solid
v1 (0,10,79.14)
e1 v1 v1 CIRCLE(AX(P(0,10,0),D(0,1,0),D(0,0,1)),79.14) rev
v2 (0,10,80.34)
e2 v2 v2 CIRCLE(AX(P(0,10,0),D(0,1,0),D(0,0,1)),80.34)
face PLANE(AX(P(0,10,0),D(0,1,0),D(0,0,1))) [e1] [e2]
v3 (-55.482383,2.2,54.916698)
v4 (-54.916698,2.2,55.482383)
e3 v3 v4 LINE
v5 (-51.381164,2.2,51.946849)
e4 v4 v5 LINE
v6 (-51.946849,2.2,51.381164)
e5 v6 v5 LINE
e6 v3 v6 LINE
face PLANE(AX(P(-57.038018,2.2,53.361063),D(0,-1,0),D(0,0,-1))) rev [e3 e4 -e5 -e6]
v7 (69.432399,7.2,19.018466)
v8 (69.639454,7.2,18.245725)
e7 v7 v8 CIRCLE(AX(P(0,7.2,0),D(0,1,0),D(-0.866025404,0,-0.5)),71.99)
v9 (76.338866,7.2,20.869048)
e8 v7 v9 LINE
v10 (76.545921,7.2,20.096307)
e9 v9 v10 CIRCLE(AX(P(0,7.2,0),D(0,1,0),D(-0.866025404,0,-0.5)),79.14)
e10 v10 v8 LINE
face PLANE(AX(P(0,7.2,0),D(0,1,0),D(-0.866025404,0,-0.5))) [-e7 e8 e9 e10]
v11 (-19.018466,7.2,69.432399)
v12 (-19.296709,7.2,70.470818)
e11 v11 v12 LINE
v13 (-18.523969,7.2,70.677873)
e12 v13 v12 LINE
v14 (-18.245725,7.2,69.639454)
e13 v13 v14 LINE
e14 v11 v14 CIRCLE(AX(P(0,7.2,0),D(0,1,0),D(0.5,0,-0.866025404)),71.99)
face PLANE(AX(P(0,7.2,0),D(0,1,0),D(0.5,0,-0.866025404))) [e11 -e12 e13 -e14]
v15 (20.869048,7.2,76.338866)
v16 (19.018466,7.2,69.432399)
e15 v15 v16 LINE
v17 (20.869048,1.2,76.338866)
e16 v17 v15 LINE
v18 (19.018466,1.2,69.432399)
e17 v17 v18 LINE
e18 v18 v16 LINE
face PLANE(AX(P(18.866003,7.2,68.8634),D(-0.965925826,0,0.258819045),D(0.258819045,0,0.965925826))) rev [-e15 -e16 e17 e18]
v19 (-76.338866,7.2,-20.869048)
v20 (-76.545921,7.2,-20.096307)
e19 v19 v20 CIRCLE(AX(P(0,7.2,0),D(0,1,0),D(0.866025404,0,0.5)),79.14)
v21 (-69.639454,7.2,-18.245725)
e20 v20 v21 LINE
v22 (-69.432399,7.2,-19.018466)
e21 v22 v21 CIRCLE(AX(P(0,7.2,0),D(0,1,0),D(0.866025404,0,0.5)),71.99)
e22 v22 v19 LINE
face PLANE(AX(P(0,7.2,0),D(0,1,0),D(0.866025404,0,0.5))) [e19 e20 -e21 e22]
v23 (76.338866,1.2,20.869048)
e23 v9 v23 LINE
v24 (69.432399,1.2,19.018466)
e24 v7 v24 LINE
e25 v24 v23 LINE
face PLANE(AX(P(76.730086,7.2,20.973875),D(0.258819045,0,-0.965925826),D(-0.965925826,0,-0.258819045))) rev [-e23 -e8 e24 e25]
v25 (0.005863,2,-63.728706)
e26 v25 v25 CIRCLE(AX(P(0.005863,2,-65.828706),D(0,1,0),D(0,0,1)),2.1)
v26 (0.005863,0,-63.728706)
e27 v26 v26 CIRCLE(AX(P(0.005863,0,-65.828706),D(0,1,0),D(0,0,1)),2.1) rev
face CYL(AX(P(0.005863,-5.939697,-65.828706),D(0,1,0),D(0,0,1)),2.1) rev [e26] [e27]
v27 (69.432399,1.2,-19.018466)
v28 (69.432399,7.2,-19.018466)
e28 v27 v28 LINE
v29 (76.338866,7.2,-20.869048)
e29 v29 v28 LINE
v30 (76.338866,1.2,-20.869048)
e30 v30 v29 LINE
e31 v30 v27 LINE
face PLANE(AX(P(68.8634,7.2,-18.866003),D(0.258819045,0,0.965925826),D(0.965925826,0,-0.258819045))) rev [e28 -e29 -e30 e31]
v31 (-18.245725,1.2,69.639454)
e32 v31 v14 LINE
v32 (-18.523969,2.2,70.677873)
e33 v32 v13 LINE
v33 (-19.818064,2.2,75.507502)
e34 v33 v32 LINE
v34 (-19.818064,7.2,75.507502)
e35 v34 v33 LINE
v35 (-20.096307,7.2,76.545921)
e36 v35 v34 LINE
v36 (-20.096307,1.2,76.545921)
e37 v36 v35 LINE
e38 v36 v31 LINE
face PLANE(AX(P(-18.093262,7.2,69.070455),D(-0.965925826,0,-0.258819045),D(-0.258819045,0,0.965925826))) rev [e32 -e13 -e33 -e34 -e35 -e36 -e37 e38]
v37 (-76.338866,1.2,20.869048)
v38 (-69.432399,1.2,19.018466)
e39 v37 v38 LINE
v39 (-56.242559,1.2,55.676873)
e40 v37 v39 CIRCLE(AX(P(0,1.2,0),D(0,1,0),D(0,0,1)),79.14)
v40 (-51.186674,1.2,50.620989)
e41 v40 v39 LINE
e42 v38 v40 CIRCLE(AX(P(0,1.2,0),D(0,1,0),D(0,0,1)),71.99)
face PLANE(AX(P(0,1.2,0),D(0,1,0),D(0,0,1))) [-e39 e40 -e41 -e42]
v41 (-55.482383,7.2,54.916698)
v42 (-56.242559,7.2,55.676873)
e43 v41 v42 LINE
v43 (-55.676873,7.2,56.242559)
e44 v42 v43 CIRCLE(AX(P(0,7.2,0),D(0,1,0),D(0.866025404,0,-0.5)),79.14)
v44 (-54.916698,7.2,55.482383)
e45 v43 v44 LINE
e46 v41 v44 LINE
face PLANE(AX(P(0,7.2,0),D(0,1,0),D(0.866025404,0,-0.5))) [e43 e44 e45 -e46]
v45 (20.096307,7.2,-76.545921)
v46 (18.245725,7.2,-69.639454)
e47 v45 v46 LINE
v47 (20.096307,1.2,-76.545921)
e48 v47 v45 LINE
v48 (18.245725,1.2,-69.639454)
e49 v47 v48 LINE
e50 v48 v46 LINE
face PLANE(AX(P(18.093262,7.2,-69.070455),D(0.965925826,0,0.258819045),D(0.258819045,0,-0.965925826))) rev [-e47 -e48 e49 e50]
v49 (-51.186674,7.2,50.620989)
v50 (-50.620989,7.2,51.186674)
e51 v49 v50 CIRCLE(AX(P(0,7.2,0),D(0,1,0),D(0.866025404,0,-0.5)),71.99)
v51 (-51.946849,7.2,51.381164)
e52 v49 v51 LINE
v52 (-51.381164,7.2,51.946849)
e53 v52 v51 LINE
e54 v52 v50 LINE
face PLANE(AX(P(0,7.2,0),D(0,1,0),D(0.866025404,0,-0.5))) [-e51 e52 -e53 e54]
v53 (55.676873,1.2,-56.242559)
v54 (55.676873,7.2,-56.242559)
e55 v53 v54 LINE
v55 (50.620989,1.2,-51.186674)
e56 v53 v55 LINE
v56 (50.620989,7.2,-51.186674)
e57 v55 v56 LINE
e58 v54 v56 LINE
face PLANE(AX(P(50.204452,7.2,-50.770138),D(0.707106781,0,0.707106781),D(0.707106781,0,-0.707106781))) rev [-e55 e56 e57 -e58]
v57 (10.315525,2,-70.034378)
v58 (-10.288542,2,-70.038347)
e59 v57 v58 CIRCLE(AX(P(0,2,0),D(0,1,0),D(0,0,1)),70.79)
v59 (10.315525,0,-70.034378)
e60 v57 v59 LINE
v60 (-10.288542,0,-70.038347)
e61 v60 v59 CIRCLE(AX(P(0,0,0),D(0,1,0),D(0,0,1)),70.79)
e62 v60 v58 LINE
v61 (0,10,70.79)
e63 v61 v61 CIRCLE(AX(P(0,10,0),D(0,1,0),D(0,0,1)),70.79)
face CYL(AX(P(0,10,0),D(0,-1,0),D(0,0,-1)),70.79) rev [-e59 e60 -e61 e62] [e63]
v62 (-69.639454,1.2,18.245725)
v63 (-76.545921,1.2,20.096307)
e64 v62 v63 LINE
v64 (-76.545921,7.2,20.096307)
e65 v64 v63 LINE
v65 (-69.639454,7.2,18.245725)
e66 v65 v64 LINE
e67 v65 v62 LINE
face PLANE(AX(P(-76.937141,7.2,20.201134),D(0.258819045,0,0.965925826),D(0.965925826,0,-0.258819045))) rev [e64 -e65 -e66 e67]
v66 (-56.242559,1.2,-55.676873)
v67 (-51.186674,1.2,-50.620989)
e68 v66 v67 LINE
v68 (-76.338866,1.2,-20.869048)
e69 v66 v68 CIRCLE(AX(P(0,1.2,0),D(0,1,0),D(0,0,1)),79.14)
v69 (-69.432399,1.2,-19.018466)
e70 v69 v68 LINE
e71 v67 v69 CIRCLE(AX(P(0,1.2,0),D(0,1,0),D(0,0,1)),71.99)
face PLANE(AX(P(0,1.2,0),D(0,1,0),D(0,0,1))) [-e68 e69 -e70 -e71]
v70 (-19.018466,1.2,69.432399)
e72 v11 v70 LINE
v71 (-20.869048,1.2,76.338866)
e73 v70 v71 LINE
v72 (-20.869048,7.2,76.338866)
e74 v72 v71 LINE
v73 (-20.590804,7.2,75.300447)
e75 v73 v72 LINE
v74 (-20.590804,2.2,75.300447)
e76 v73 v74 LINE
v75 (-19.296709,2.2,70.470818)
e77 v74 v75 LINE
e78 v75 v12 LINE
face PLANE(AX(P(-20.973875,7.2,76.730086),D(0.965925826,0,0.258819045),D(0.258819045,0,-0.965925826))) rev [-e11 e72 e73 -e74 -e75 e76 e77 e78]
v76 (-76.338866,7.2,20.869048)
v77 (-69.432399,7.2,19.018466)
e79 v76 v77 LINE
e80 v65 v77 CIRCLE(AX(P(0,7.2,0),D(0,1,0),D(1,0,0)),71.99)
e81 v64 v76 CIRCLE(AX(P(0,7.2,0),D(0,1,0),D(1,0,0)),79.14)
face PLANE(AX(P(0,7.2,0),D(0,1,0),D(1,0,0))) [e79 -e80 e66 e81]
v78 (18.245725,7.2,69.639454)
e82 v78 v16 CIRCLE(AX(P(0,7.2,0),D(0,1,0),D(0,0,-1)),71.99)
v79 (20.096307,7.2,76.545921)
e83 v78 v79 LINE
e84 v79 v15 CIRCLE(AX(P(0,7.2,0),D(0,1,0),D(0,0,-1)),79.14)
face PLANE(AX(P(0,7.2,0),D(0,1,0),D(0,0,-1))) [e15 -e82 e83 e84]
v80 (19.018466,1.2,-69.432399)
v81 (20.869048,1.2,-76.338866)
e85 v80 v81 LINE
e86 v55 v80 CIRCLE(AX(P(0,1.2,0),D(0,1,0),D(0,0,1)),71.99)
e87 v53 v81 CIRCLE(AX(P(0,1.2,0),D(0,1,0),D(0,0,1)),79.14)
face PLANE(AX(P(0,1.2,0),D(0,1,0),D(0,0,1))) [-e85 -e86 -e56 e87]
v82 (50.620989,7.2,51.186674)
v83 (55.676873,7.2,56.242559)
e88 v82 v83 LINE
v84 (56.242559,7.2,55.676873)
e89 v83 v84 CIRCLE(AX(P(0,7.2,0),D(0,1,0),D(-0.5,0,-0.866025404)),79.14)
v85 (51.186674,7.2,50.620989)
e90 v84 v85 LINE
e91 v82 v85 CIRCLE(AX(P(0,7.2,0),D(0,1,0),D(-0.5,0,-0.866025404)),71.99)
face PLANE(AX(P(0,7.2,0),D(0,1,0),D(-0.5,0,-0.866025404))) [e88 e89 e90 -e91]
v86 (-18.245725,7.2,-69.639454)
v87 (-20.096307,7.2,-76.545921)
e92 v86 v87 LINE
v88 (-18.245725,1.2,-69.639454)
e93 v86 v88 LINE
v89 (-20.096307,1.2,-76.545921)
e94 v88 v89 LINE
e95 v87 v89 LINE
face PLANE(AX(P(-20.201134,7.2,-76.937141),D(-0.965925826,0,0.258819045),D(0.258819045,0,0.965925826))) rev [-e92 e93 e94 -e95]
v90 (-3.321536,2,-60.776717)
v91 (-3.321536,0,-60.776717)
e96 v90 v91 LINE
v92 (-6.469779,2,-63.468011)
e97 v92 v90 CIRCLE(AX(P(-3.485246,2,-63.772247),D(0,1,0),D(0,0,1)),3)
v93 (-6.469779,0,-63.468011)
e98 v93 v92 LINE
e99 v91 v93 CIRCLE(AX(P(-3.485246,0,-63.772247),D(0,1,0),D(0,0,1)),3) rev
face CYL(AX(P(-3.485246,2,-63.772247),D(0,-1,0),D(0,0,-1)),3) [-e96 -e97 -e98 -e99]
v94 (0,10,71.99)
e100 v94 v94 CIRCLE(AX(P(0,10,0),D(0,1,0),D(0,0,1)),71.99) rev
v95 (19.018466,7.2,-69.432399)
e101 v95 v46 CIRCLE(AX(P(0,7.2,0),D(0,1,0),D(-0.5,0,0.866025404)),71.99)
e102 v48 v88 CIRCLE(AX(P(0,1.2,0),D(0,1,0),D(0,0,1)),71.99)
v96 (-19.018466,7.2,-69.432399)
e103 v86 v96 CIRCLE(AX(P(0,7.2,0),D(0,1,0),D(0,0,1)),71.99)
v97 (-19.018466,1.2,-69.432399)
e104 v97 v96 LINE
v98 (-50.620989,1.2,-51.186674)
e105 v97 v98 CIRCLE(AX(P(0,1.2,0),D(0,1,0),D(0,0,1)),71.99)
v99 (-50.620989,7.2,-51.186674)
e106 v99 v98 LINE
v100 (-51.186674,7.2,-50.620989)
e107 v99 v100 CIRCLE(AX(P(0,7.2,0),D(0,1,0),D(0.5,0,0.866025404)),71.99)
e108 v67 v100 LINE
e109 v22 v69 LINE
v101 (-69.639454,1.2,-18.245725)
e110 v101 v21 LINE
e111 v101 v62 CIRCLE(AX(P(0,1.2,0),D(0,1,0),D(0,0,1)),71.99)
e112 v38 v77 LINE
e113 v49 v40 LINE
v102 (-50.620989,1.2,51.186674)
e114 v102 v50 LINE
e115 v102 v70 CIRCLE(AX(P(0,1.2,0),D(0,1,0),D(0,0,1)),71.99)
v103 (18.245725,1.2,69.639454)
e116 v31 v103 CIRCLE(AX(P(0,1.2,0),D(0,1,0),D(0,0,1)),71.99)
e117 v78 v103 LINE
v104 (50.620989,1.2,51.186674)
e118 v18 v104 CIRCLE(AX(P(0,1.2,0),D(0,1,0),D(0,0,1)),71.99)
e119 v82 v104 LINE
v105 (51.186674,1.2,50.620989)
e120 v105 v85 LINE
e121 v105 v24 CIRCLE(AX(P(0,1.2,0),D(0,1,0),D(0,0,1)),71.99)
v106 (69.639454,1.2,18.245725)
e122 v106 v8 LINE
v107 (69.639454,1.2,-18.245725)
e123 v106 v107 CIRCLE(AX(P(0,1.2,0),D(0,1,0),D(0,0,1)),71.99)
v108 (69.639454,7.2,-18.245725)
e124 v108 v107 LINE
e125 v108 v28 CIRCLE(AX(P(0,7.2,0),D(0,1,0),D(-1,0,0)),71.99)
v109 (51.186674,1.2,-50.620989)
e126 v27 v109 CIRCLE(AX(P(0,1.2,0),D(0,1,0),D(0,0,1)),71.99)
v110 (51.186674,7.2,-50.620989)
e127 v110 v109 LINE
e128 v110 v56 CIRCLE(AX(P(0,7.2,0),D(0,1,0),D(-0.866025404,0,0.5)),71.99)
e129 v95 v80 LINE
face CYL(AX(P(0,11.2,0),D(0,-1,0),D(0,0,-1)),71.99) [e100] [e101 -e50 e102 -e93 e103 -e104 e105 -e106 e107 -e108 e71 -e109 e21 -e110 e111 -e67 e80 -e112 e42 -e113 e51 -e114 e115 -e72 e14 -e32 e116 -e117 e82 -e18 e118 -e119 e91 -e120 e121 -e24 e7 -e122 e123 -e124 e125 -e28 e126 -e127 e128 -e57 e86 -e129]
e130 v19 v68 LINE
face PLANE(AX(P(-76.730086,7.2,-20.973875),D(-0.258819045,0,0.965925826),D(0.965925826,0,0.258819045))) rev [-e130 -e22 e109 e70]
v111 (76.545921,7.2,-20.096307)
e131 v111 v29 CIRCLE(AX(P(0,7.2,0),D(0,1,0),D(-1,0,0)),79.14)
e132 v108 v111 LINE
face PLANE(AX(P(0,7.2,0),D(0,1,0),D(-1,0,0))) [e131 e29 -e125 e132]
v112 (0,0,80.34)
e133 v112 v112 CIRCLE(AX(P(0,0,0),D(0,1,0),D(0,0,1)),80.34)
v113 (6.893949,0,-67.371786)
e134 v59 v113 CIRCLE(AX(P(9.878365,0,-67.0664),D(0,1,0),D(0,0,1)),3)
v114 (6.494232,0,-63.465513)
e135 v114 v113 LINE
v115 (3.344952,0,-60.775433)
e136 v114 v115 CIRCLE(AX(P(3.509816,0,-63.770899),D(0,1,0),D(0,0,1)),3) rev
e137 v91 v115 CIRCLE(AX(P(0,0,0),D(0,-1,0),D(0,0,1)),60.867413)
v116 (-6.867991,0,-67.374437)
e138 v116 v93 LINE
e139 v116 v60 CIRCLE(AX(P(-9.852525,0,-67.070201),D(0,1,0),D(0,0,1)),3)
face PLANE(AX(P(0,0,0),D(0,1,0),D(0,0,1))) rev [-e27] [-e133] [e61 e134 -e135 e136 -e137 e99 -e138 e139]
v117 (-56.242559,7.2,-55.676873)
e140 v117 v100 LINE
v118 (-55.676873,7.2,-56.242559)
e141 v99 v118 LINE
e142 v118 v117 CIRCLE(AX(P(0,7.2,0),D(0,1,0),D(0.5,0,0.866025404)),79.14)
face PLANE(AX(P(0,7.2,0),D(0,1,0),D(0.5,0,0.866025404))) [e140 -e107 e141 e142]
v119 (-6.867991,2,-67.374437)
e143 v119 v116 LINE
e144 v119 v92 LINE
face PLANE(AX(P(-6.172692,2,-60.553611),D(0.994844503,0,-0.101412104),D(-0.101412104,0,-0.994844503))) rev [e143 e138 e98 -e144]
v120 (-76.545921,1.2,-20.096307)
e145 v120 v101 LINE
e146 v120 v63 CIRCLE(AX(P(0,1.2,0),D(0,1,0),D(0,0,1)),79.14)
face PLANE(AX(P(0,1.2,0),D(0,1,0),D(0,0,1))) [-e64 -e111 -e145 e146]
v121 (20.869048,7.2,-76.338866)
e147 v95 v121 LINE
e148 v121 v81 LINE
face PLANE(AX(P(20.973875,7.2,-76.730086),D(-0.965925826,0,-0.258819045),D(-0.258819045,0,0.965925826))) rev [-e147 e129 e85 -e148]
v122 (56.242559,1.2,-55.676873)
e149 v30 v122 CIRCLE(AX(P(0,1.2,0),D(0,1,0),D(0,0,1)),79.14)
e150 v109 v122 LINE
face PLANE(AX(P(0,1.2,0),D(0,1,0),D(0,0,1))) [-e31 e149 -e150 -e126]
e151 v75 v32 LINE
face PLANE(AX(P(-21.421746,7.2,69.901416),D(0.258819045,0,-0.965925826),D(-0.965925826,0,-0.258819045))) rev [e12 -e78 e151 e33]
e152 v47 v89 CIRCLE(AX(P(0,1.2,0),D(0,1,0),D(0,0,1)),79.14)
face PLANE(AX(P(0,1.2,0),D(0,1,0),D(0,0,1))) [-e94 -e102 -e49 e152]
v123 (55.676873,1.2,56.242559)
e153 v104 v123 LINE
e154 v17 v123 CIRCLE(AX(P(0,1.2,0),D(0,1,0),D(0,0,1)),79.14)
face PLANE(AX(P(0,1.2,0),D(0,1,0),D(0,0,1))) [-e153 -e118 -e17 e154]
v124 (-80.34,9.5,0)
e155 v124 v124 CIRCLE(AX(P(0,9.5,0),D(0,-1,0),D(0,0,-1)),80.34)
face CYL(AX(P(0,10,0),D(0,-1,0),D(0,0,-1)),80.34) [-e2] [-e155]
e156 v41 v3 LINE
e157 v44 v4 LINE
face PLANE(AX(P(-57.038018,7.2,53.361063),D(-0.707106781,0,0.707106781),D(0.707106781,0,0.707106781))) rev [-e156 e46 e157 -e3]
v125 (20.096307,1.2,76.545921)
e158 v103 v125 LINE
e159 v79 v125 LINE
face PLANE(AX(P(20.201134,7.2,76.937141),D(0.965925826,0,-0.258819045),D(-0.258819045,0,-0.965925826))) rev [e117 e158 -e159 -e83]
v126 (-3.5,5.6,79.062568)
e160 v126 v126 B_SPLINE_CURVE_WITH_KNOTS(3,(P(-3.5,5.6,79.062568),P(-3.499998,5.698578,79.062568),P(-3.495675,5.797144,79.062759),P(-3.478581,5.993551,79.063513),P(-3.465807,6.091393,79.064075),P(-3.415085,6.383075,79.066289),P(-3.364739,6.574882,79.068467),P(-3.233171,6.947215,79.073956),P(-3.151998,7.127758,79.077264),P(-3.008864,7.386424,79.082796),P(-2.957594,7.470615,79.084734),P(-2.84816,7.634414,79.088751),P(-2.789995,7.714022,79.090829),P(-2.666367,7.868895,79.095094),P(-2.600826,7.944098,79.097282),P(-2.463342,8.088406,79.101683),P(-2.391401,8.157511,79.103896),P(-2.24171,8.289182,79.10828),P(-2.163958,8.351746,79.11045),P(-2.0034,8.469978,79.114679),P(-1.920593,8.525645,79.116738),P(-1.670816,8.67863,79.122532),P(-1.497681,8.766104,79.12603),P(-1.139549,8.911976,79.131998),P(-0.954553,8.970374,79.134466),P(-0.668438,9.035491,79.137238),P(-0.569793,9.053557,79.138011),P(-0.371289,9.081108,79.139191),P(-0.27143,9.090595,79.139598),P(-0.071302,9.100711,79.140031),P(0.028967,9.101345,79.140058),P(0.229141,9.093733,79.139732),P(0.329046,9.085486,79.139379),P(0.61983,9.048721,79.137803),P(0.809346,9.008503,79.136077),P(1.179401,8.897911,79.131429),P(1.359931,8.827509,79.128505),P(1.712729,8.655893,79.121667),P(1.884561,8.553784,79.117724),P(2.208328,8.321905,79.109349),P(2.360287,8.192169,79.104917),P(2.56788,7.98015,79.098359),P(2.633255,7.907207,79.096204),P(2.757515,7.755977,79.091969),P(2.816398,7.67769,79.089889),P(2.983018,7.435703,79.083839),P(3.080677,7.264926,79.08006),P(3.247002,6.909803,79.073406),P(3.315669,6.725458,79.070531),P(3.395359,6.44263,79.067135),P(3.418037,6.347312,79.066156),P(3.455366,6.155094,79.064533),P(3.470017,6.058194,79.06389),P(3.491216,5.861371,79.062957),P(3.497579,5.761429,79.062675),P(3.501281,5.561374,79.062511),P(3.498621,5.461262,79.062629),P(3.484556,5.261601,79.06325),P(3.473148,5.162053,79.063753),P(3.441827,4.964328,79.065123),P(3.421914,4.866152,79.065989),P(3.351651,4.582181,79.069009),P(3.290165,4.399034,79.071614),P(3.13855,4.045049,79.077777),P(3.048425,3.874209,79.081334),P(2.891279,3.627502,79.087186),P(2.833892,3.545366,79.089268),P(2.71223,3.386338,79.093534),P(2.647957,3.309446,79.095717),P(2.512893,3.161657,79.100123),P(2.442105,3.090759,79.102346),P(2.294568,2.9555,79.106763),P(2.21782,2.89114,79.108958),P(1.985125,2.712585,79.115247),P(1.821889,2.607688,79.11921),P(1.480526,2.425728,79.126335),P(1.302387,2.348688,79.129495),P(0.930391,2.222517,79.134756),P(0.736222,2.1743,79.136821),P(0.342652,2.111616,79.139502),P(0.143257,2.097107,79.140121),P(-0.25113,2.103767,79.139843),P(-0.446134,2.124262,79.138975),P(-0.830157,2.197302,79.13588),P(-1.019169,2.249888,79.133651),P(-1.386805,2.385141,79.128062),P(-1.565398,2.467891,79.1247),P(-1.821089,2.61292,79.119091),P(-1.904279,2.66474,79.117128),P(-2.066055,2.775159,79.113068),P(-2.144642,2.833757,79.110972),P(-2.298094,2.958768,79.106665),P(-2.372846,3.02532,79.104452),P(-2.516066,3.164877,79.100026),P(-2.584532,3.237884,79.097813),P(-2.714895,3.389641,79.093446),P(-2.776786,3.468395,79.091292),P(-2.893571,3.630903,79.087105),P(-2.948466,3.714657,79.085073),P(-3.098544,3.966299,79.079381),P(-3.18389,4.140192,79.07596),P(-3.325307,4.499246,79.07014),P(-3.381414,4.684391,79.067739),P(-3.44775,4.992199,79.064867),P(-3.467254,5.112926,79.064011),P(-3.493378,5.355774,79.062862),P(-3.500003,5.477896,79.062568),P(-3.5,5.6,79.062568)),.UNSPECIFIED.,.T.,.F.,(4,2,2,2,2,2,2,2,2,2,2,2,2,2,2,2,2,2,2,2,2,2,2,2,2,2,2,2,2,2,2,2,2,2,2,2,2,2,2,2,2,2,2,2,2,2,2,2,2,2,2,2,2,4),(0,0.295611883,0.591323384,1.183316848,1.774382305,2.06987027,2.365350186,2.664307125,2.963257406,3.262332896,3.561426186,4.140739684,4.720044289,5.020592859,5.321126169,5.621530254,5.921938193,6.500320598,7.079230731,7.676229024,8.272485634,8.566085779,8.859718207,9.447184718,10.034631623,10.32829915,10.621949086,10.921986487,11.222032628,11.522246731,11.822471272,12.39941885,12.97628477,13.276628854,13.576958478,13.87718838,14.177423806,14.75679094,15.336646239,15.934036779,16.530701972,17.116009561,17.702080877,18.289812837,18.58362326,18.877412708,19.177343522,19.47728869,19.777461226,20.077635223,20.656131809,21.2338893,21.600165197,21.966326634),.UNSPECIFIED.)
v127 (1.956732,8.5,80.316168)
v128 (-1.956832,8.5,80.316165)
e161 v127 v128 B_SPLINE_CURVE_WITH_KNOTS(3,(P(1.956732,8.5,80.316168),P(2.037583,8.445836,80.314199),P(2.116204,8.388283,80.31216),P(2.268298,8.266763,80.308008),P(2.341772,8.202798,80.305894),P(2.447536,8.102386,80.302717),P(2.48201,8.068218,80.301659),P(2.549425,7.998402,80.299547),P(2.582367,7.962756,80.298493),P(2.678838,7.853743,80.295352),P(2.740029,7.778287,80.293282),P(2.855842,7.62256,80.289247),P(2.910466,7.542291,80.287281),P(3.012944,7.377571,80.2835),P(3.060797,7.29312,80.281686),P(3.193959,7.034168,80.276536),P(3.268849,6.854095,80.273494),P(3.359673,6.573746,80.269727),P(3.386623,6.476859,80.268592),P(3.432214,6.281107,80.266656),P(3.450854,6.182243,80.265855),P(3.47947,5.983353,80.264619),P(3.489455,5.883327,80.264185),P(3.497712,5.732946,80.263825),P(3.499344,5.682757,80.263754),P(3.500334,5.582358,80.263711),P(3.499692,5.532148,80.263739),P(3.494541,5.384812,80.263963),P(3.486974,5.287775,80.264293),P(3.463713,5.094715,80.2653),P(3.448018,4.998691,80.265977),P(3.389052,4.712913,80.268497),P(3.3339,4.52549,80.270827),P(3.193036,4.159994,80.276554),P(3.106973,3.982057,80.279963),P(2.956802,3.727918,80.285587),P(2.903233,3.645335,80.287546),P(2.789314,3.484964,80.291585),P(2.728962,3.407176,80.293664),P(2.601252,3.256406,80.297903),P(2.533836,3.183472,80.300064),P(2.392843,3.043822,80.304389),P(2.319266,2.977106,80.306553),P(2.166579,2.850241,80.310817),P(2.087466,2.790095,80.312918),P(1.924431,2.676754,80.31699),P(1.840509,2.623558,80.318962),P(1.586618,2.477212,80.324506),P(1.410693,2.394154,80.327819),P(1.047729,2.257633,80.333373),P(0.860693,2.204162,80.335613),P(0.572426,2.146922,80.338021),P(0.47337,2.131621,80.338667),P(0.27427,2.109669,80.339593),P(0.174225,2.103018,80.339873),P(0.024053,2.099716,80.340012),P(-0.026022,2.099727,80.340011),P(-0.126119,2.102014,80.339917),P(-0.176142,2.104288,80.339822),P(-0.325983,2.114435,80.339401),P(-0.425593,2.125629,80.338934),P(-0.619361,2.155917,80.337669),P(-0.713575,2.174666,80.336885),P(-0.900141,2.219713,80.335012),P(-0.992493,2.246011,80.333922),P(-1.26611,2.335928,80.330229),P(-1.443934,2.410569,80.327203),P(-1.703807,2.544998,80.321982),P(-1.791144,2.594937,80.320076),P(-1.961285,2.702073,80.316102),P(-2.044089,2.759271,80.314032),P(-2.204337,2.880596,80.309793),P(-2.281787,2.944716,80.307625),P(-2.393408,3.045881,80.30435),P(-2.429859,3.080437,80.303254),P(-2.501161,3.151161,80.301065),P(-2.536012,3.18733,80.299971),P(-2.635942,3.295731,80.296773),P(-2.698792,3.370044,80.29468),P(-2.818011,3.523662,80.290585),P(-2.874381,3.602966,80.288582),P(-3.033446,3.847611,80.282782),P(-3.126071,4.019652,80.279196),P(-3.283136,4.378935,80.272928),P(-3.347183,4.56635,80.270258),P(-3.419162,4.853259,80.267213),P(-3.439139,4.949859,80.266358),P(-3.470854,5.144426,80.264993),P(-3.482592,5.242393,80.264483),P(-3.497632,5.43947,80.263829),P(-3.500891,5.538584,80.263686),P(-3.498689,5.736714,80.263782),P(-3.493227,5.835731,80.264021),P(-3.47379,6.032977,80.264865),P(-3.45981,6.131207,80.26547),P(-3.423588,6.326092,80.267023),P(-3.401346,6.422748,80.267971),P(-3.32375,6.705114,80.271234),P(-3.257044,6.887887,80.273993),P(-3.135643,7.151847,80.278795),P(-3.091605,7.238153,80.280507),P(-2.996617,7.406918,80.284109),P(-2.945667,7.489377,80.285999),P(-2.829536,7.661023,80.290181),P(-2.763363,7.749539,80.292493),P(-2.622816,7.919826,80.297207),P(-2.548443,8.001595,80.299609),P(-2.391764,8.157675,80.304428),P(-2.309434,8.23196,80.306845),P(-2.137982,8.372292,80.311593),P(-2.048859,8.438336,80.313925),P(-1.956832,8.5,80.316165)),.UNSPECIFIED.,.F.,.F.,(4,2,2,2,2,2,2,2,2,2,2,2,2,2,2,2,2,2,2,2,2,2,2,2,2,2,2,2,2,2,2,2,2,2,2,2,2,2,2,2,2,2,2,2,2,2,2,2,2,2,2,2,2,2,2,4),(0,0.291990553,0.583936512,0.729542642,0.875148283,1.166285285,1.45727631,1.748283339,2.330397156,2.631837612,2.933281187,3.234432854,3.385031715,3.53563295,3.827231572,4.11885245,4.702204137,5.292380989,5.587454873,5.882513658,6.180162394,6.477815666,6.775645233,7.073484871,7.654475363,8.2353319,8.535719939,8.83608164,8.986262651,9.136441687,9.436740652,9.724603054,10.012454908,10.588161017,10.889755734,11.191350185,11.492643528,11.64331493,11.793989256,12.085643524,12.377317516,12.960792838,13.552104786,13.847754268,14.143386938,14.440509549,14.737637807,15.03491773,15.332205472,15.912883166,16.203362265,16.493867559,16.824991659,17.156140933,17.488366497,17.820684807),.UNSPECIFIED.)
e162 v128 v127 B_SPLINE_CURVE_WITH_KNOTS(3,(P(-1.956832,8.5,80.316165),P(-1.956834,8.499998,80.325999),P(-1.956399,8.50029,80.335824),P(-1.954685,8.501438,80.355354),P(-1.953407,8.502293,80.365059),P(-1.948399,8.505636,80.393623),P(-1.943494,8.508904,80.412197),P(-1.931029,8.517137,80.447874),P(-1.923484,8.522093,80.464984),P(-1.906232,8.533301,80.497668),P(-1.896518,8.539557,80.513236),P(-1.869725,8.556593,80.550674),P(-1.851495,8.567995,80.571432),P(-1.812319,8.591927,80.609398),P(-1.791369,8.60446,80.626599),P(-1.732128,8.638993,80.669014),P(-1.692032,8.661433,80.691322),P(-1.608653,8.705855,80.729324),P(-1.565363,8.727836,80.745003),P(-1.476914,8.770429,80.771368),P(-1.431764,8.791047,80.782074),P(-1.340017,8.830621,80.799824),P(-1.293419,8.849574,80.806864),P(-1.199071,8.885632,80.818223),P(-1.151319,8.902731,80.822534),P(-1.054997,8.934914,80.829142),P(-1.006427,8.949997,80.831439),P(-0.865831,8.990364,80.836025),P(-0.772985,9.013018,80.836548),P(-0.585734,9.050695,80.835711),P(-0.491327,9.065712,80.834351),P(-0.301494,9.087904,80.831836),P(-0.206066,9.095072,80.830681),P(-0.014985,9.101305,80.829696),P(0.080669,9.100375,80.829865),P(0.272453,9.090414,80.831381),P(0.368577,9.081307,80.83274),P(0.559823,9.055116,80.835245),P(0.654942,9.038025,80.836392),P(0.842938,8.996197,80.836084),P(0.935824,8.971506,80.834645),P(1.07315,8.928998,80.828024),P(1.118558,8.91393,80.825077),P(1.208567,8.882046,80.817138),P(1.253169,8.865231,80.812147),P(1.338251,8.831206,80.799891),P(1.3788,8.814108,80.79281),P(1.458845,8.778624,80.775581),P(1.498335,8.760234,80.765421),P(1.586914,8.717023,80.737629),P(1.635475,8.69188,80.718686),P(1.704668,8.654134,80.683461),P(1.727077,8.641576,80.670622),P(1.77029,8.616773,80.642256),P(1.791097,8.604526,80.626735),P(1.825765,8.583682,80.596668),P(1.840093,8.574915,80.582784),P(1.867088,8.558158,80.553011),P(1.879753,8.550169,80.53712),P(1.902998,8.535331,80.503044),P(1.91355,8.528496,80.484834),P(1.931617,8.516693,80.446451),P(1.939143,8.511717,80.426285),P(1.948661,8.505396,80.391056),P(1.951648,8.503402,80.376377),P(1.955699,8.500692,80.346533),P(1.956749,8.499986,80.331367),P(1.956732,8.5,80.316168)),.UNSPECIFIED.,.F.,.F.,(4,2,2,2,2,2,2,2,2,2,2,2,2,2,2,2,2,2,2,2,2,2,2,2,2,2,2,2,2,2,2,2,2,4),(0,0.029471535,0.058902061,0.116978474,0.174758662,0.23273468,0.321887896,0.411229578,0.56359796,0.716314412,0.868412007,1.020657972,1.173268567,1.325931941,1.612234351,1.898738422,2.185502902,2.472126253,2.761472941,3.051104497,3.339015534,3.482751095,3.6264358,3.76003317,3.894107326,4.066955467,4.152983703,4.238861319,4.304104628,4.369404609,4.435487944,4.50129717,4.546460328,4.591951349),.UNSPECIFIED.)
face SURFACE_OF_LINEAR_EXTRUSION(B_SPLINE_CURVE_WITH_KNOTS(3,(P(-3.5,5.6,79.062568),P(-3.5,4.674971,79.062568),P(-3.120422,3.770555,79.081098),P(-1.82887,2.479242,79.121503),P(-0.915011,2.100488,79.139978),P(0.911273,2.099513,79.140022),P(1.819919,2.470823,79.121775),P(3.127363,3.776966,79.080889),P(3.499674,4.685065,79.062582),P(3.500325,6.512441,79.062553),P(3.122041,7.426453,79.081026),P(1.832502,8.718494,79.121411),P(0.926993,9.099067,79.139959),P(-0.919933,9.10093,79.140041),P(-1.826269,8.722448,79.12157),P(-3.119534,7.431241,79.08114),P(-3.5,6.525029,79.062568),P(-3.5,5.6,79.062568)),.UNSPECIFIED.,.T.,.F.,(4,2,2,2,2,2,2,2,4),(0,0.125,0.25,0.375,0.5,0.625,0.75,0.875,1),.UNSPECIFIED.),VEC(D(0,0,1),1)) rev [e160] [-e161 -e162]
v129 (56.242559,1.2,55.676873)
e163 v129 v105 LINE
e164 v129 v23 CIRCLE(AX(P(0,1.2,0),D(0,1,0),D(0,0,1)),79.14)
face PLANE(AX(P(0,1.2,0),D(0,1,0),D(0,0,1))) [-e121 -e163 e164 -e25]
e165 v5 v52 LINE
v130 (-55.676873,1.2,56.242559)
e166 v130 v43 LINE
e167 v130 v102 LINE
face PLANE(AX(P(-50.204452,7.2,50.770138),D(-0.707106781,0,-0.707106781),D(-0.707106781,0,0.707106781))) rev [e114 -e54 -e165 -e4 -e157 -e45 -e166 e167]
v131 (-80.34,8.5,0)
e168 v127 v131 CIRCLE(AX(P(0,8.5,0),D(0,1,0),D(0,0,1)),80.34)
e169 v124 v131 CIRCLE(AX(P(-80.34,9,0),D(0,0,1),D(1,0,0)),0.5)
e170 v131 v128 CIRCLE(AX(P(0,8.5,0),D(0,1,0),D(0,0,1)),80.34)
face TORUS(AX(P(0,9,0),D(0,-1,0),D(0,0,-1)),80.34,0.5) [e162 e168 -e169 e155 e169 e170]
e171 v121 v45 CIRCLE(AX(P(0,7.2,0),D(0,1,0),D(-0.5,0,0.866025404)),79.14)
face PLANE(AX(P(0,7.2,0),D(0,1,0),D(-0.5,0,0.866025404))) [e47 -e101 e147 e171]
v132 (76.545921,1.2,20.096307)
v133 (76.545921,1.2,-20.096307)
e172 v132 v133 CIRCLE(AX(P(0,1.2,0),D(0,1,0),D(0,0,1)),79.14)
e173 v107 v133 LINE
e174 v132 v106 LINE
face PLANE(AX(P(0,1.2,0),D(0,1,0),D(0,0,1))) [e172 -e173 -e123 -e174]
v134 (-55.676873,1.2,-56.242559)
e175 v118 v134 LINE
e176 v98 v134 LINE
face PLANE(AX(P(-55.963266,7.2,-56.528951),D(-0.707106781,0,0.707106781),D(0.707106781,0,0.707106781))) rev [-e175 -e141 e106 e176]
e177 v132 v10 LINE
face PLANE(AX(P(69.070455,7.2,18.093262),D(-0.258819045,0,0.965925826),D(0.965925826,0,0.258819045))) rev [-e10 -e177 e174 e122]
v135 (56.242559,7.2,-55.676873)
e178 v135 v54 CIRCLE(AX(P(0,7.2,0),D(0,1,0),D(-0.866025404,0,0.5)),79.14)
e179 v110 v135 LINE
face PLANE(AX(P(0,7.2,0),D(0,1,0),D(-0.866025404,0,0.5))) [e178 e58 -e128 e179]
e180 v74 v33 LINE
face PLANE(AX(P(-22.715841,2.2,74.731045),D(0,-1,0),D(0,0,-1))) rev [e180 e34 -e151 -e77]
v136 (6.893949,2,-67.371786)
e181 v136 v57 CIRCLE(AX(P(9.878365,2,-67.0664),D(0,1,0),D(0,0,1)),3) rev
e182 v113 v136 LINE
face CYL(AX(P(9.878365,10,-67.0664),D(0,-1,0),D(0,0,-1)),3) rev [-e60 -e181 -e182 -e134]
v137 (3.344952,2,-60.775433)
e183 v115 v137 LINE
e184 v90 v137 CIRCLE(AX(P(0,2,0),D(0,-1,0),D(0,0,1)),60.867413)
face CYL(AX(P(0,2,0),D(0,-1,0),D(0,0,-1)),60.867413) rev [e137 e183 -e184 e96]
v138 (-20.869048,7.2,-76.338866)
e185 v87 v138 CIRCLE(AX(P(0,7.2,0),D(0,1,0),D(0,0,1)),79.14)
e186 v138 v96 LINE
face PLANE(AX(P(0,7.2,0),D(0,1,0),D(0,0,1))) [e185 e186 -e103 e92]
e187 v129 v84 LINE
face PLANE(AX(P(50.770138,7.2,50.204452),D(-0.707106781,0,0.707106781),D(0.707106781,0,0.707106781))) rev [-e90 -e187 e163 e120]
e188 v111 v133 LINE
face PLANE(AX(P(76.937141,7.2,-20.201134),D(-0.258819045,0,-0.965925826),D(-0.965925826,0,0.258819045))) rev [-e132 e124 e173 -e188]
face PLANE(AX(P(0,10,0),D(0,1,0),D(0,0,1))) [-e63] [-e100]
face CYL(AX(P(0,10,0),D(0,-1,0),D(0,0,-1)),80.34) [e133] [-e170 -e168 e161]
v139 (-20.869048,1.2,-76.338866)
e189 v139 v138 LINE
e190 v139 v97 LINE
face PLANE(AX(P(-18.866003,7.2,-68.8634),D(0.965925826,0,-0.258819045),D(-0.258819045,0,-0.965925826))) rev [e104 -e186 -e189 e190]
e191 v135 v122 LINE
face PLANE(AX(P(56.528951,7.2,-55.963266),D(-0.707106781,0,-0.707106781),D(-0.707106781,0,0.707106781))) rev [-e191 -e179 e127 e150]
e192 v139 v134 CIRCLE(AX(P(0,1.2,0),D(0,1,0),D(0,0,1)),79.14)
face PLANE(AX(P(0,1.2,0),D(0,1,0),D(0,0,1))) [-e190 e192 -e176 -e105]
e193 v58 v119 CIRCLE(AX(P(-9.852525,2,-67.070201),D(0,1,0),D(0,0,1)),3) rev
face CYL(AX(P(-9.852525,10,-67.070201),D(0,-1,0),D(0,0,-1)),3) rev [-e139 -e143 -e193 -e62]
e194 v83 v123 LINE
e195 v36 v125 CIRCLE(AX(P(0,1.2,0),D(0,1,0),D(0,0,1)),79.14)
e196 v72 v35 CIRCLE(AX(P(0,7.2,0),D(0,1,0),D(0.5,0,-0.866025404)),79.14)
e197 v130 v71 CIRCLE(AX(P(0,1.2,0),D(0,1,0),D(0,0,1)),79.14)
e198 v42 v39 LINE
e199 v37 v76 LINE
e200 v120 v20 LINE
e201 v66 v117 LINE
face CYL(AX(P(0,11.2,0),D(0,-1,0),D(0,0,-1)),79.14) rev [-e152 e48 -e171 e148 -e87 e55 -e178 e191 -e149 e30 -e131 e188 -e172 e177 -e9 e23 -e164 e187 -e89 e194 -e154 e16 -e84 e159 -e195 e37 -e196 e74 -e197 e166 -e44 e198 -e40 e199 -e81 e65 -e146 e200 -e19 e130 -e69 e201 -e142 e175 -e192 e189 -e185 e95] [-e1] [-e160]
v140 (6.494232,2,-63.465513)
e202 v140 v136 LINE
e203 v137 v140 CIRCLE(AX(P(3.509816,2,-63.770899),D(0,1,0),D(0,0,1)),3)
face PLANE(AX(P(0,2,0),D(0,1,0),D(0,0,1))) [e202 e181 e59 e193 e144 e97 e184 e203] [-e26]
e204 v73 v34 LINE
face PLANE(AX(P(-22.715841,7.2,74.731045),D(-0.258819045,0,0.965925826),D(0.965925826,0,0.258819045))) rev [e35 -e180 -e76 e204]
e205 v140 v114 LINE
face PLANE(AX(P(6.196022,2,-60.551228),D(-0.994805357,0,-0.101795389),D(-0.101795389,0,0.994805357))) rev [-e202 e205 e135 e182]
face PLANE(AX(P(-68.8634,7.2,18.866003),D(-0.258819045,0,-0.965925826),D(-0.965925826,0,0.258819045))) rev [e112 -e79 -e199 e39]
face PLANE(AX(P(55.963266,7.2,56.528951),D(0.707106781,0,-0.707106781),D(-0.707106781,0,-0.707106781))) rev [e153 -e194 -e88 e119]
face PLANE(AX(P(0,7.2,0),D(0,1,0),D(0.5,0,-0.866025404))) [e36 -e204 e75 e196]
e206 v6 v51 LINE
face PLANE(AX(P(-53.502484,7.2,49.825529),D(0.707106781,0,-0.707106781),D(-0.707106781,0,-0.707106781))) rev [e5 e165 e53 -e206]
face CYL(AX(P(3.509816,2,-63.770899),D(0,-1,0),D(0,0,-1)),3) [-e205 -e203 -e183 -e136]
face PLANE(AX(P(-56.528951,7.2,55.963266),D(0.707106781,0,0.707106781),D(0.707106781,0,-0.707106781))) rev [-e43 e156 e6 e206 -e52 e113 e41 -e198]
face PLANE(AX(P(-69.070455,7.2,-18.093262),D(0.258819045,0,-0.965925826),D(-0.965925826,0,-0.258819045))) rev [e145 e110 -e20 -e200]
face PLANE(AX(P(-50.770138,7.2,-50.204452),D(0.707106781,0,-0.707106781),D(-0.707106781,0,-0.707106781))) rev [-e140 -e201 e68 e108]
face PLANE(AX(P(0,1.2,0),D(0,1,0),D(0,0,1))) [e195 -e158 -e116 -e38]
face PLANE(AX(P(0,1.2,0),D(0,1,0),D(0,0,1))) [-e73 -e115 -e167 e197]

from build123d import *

# Parameters (mm, degrees)
RING_BASE_R         = 80.34
RING_BASE_R_2       = 70.79
BOSS_EXTRUDE1_DEPTH = 10
CUT_EXTRUDE1_START  = 1.2
CHANNEL_R           = 79.14
CHANNEL_R_2         = 71.99
CUT_EXTRUDE1_DEPTH  = 10
BOSS_EXTRUDE2_DEPTH = 6
CRVPATTERN2_COUNT   = 12
BOSS_EXTRUDE3_DEPTH = 2
SKETCH7_R           = 2.1
CUT_EXTRUDE3_DEPTH  = 2
FILLET1_R           = 3
FILLET2_R           = 3
CUT_EXTRUDE4_START  = 78
CUT_EXTRUDE4_DEPTH  = 4
SKETCH16_W          = 5
SKETCH16_H          = 5
CUT_EXTRUDE5_DEPTH  = 3
SKETCH17_W          = 5
SKETCH17_H          = 5
CUT_EXTRUDE6_DEPTH  = 3


with BuildPart() as part:
    # Ring Base → Boss-Extrude1 (new body)
    with BuildSketch(Plane(origin=(0, 0, 0), x_dir=(1, 0, 0), z_dir=(0, 1, 0))):
        with Locations(Location((0, 0, 0), (0, 0, 270))):
            Circle(RING_BASE_R)
        with Locations(Location((0, 0, 0), (0, 0, 270))):
            Circle(RING_BASE_R_2, mode=Mode.SUBTRACT)
    extrude(amount=BOSS_EXTRUDE1_DEPTH)

    # Channel → Cut-Extrude1 (cut)
    with BuildSketch(Plane(origin=(0, 0, 0), x_dir=(1, 0, 0), z_dir=(0, 1, 0)).offset(CUT_EXTRUDE1_START)):
        with Locations(Location((0, 0, 0), (0, 0, 270))):
            Circle(CHANNEL_R)
        with Locations(Location((0, 0, 0), (0, 0, 270))):
            Circle(CHANNEL_R_2, mode=Mode.SUBTRACT)
    extrude(amount=CUT_EXTRUDE1_DEPTH, mode=Mode.SUBTRACT)

    # Sketch3 → Boss-Extrude2 (add)
    with BuildSketch(Plane(origin=(0, 1.2, 0), x_dir=(1, 0, 0), z_dir=(0, 1, 0))):
        with BuildLine():
            Line((-20.201134269, 76.937140785), (-18.093262133, 69.070454876))
            Line((-18.093262133, 69.070454876), (-18.866002794, 68.86339964))
            Line((-18.866002794, 68.86339964), (-20.97387493, 76.730085549))
            Line((-20.97387493, 76.730085549), (-21.179634689, 77.497991422))
            ThreePointArc((-21.179634689, 77.497991422), (-20.793522084, 77.602480884), (-20.406894028, 77.705046658))
            Line((-20.406894028, 77.705046658), (-20.201134269, 76.937140785))
        make_face()
    boss_extrude2 = extrude(amount=BOSS_EXTRUDE2_DEPTH)

    # CrvPattern2: Boss-Extrude2 ×12 about axis
    crvpattern2_axis = Axis((0, 10, 0), (0, 1, 0))
    for i in range(1, CRVPATTERN2_COUNT):
        add(boss_extrude2.rotate(crvpattern2_axis, i * 360 / CRVPATTERN2_COUNT))

    # Sketch6 → Boss-Extrude3 (add)
    with BuildSketch(Plane(origin=(0, 0, 0), x_dir=(1, 0, 0), z_dir=(0, 1, 0))):
        with BuildLine():
            Line((6.196021971, 60.551228328), (7.213975862, 70.499281901))
            ThreePointArc((7.213975862, 70.499281901), (0.013651853, 70.86741148), (-7.186813453, 70.50205606))
            Line((-7.186813453, 70.50205606), (-6.172692411, 60.55361103))
            ThreePointArc((-6.172692411, 60.55361103), (0.01172546, 60.867411665), (6.196021971, 60.551228328))
        make_face()
    extrude(amount=BOSS_EXTRUDE3_DEPTH)

    # Sketch7 → Cut-Extrude3 (cut)
    with BuildSketch(Plane(origin=(0, 2, 0), x_dir=(1, 0, 0), z_dir=(0, 1, 0))):
        with Locations(Location((0.00586273, 65.828705833, 0), (0, 0, 270))):
            Circle(SKETCH7_R)
    extrude(amount=-CUT_EXTRUDE3_DEPTH, mode=Mode.SUBTRACT)

    # Fillet1
    fillet1_edges = [part.edges().sort_by_distance(p)[0] for p in [
        (-6.172692411, 1, -60.55361103),
        (6.196021971, 1, -60.551228328),
    ]]
    fillet(fillet1_edges, radius=FILLET1_R)

    # Fillet2
    fillet2_edges = [part.edges().sort_by_distance(p)[0] for p in [
        (-7.178962859, 1, -70.425042366),
        (7.206095596, 1, -70.422271238),
    ]]
    fillet(fillet2_edges, radius=FILLET2_R)

    # Sweep1: sweep along a curve in space
    with BuildLine() as sweep1_path:
        ThreePointArc((0, 10, 80.34), (56.808958801, 10, 56.808958801), (80.34, 10, 0))
        ThreePointArc((80.34, 10, 0), (56.808958801, 10, -56.808958801), (0, 10, -80.34))
        ThreePointArc((0, 10, -80.34), (-56.808958801, 10, -56.808958801), (-80.34, 10, 0))
        ThreePointArc((-80.34, 10, 0), (-56.808958801, 10, 56.808958801), (0, 10, 80.34))
    # Sketch13 → Sweep1 (sweep)
    with BuildSketch(Plane.XY):
        with BuildLine():
            Line((-80.34, 9.5), (-80.34, 8.5))
            ThreePointArc((-80.34, 8.5), (-80.84, 9), (-80.34, 9.5))
        make_face()
    sweep(path=sweep1_path.line)

    # Cut-Extrude4: read off the stored shape, not the designer's step
    # Cut-Extrude4 outline → Cut-Extrude4 (cut)
    with BuildSketch(Plane.XY.offset(CUT_EXTRUDE4_START)):
        with BuildLine():
            add(Edge.make_bspline(
                [(-3.5, 5.6), (-3.5, 4.674971243), (-3.120421721, 3.770555402), (-1.828870121, 2.479241546), (-0.915010795, 2.100488124), (0.911272738, 2.099512874), (1.819919195, 2.470823008), (3.127363124, 3.776965602), (3.499674295, 4.685065061), (3.500325261, 6.512441328), (3.122041036, 7.4264528), (1.832502447, 8.718494002), (0.92699326, 9.099066808), (-0.919933012, 9.100929631), (-1.826268625, 8.72244788), (-3.119534317, 7.431240973), (-3.5, 6.525028757), (-3.5, 5.6)],
                knots=[0, 0, 0, 0, 0.125, 0.125, 0.25, 0.25, 0.375, 0.375, 0.5, 0.5, 0.625, 0.625, 0.75, 0.75, 0.875, 0.875, 1, 1, 1, 1], degree=3))
        make_face()
    extrude(amount=CUT_EXTRUDE4_DEPTH, mode=Mode.SUBTRACT)

    # Sketch16 → Cut-Extrude5 (cut)
    with BuildSketch(Plane(origin=(0.386370331, 0, 0.103527618), x_dir=(0.2588190451025204, 0, -0.9659258262890684), z_dir=(0.9659258262890684, 0, 0.2588190451025204))):
        with Locations((-75.563938926, 4.7)):
            Rectangle(SKETCH16_W, SKETCH16_H)
    extrude(amount=-CUT_EXTRUDE5_DEPTH, mode=Mode.SUBTRACT)

    # Sketch17 → Cut-Extrude6 (cut)
    with BuildSketch(Plane(origin=(0.282842712, 0, 0.282842712), x_dir=(0.7071067811865475, 0, -0.7071067811865477), z_dir=(0.7071067811865477, 0, 0.7071067811865475))):
        with Locations((-75.563938926, 4.7)):
            Rectangle(SKETCH17_W, SKETCH17_H)
    extrude(amount=-CUT_EXTRUDE6_DEPTH, mode=Mode.SUBTRACT)


solid = part.part
